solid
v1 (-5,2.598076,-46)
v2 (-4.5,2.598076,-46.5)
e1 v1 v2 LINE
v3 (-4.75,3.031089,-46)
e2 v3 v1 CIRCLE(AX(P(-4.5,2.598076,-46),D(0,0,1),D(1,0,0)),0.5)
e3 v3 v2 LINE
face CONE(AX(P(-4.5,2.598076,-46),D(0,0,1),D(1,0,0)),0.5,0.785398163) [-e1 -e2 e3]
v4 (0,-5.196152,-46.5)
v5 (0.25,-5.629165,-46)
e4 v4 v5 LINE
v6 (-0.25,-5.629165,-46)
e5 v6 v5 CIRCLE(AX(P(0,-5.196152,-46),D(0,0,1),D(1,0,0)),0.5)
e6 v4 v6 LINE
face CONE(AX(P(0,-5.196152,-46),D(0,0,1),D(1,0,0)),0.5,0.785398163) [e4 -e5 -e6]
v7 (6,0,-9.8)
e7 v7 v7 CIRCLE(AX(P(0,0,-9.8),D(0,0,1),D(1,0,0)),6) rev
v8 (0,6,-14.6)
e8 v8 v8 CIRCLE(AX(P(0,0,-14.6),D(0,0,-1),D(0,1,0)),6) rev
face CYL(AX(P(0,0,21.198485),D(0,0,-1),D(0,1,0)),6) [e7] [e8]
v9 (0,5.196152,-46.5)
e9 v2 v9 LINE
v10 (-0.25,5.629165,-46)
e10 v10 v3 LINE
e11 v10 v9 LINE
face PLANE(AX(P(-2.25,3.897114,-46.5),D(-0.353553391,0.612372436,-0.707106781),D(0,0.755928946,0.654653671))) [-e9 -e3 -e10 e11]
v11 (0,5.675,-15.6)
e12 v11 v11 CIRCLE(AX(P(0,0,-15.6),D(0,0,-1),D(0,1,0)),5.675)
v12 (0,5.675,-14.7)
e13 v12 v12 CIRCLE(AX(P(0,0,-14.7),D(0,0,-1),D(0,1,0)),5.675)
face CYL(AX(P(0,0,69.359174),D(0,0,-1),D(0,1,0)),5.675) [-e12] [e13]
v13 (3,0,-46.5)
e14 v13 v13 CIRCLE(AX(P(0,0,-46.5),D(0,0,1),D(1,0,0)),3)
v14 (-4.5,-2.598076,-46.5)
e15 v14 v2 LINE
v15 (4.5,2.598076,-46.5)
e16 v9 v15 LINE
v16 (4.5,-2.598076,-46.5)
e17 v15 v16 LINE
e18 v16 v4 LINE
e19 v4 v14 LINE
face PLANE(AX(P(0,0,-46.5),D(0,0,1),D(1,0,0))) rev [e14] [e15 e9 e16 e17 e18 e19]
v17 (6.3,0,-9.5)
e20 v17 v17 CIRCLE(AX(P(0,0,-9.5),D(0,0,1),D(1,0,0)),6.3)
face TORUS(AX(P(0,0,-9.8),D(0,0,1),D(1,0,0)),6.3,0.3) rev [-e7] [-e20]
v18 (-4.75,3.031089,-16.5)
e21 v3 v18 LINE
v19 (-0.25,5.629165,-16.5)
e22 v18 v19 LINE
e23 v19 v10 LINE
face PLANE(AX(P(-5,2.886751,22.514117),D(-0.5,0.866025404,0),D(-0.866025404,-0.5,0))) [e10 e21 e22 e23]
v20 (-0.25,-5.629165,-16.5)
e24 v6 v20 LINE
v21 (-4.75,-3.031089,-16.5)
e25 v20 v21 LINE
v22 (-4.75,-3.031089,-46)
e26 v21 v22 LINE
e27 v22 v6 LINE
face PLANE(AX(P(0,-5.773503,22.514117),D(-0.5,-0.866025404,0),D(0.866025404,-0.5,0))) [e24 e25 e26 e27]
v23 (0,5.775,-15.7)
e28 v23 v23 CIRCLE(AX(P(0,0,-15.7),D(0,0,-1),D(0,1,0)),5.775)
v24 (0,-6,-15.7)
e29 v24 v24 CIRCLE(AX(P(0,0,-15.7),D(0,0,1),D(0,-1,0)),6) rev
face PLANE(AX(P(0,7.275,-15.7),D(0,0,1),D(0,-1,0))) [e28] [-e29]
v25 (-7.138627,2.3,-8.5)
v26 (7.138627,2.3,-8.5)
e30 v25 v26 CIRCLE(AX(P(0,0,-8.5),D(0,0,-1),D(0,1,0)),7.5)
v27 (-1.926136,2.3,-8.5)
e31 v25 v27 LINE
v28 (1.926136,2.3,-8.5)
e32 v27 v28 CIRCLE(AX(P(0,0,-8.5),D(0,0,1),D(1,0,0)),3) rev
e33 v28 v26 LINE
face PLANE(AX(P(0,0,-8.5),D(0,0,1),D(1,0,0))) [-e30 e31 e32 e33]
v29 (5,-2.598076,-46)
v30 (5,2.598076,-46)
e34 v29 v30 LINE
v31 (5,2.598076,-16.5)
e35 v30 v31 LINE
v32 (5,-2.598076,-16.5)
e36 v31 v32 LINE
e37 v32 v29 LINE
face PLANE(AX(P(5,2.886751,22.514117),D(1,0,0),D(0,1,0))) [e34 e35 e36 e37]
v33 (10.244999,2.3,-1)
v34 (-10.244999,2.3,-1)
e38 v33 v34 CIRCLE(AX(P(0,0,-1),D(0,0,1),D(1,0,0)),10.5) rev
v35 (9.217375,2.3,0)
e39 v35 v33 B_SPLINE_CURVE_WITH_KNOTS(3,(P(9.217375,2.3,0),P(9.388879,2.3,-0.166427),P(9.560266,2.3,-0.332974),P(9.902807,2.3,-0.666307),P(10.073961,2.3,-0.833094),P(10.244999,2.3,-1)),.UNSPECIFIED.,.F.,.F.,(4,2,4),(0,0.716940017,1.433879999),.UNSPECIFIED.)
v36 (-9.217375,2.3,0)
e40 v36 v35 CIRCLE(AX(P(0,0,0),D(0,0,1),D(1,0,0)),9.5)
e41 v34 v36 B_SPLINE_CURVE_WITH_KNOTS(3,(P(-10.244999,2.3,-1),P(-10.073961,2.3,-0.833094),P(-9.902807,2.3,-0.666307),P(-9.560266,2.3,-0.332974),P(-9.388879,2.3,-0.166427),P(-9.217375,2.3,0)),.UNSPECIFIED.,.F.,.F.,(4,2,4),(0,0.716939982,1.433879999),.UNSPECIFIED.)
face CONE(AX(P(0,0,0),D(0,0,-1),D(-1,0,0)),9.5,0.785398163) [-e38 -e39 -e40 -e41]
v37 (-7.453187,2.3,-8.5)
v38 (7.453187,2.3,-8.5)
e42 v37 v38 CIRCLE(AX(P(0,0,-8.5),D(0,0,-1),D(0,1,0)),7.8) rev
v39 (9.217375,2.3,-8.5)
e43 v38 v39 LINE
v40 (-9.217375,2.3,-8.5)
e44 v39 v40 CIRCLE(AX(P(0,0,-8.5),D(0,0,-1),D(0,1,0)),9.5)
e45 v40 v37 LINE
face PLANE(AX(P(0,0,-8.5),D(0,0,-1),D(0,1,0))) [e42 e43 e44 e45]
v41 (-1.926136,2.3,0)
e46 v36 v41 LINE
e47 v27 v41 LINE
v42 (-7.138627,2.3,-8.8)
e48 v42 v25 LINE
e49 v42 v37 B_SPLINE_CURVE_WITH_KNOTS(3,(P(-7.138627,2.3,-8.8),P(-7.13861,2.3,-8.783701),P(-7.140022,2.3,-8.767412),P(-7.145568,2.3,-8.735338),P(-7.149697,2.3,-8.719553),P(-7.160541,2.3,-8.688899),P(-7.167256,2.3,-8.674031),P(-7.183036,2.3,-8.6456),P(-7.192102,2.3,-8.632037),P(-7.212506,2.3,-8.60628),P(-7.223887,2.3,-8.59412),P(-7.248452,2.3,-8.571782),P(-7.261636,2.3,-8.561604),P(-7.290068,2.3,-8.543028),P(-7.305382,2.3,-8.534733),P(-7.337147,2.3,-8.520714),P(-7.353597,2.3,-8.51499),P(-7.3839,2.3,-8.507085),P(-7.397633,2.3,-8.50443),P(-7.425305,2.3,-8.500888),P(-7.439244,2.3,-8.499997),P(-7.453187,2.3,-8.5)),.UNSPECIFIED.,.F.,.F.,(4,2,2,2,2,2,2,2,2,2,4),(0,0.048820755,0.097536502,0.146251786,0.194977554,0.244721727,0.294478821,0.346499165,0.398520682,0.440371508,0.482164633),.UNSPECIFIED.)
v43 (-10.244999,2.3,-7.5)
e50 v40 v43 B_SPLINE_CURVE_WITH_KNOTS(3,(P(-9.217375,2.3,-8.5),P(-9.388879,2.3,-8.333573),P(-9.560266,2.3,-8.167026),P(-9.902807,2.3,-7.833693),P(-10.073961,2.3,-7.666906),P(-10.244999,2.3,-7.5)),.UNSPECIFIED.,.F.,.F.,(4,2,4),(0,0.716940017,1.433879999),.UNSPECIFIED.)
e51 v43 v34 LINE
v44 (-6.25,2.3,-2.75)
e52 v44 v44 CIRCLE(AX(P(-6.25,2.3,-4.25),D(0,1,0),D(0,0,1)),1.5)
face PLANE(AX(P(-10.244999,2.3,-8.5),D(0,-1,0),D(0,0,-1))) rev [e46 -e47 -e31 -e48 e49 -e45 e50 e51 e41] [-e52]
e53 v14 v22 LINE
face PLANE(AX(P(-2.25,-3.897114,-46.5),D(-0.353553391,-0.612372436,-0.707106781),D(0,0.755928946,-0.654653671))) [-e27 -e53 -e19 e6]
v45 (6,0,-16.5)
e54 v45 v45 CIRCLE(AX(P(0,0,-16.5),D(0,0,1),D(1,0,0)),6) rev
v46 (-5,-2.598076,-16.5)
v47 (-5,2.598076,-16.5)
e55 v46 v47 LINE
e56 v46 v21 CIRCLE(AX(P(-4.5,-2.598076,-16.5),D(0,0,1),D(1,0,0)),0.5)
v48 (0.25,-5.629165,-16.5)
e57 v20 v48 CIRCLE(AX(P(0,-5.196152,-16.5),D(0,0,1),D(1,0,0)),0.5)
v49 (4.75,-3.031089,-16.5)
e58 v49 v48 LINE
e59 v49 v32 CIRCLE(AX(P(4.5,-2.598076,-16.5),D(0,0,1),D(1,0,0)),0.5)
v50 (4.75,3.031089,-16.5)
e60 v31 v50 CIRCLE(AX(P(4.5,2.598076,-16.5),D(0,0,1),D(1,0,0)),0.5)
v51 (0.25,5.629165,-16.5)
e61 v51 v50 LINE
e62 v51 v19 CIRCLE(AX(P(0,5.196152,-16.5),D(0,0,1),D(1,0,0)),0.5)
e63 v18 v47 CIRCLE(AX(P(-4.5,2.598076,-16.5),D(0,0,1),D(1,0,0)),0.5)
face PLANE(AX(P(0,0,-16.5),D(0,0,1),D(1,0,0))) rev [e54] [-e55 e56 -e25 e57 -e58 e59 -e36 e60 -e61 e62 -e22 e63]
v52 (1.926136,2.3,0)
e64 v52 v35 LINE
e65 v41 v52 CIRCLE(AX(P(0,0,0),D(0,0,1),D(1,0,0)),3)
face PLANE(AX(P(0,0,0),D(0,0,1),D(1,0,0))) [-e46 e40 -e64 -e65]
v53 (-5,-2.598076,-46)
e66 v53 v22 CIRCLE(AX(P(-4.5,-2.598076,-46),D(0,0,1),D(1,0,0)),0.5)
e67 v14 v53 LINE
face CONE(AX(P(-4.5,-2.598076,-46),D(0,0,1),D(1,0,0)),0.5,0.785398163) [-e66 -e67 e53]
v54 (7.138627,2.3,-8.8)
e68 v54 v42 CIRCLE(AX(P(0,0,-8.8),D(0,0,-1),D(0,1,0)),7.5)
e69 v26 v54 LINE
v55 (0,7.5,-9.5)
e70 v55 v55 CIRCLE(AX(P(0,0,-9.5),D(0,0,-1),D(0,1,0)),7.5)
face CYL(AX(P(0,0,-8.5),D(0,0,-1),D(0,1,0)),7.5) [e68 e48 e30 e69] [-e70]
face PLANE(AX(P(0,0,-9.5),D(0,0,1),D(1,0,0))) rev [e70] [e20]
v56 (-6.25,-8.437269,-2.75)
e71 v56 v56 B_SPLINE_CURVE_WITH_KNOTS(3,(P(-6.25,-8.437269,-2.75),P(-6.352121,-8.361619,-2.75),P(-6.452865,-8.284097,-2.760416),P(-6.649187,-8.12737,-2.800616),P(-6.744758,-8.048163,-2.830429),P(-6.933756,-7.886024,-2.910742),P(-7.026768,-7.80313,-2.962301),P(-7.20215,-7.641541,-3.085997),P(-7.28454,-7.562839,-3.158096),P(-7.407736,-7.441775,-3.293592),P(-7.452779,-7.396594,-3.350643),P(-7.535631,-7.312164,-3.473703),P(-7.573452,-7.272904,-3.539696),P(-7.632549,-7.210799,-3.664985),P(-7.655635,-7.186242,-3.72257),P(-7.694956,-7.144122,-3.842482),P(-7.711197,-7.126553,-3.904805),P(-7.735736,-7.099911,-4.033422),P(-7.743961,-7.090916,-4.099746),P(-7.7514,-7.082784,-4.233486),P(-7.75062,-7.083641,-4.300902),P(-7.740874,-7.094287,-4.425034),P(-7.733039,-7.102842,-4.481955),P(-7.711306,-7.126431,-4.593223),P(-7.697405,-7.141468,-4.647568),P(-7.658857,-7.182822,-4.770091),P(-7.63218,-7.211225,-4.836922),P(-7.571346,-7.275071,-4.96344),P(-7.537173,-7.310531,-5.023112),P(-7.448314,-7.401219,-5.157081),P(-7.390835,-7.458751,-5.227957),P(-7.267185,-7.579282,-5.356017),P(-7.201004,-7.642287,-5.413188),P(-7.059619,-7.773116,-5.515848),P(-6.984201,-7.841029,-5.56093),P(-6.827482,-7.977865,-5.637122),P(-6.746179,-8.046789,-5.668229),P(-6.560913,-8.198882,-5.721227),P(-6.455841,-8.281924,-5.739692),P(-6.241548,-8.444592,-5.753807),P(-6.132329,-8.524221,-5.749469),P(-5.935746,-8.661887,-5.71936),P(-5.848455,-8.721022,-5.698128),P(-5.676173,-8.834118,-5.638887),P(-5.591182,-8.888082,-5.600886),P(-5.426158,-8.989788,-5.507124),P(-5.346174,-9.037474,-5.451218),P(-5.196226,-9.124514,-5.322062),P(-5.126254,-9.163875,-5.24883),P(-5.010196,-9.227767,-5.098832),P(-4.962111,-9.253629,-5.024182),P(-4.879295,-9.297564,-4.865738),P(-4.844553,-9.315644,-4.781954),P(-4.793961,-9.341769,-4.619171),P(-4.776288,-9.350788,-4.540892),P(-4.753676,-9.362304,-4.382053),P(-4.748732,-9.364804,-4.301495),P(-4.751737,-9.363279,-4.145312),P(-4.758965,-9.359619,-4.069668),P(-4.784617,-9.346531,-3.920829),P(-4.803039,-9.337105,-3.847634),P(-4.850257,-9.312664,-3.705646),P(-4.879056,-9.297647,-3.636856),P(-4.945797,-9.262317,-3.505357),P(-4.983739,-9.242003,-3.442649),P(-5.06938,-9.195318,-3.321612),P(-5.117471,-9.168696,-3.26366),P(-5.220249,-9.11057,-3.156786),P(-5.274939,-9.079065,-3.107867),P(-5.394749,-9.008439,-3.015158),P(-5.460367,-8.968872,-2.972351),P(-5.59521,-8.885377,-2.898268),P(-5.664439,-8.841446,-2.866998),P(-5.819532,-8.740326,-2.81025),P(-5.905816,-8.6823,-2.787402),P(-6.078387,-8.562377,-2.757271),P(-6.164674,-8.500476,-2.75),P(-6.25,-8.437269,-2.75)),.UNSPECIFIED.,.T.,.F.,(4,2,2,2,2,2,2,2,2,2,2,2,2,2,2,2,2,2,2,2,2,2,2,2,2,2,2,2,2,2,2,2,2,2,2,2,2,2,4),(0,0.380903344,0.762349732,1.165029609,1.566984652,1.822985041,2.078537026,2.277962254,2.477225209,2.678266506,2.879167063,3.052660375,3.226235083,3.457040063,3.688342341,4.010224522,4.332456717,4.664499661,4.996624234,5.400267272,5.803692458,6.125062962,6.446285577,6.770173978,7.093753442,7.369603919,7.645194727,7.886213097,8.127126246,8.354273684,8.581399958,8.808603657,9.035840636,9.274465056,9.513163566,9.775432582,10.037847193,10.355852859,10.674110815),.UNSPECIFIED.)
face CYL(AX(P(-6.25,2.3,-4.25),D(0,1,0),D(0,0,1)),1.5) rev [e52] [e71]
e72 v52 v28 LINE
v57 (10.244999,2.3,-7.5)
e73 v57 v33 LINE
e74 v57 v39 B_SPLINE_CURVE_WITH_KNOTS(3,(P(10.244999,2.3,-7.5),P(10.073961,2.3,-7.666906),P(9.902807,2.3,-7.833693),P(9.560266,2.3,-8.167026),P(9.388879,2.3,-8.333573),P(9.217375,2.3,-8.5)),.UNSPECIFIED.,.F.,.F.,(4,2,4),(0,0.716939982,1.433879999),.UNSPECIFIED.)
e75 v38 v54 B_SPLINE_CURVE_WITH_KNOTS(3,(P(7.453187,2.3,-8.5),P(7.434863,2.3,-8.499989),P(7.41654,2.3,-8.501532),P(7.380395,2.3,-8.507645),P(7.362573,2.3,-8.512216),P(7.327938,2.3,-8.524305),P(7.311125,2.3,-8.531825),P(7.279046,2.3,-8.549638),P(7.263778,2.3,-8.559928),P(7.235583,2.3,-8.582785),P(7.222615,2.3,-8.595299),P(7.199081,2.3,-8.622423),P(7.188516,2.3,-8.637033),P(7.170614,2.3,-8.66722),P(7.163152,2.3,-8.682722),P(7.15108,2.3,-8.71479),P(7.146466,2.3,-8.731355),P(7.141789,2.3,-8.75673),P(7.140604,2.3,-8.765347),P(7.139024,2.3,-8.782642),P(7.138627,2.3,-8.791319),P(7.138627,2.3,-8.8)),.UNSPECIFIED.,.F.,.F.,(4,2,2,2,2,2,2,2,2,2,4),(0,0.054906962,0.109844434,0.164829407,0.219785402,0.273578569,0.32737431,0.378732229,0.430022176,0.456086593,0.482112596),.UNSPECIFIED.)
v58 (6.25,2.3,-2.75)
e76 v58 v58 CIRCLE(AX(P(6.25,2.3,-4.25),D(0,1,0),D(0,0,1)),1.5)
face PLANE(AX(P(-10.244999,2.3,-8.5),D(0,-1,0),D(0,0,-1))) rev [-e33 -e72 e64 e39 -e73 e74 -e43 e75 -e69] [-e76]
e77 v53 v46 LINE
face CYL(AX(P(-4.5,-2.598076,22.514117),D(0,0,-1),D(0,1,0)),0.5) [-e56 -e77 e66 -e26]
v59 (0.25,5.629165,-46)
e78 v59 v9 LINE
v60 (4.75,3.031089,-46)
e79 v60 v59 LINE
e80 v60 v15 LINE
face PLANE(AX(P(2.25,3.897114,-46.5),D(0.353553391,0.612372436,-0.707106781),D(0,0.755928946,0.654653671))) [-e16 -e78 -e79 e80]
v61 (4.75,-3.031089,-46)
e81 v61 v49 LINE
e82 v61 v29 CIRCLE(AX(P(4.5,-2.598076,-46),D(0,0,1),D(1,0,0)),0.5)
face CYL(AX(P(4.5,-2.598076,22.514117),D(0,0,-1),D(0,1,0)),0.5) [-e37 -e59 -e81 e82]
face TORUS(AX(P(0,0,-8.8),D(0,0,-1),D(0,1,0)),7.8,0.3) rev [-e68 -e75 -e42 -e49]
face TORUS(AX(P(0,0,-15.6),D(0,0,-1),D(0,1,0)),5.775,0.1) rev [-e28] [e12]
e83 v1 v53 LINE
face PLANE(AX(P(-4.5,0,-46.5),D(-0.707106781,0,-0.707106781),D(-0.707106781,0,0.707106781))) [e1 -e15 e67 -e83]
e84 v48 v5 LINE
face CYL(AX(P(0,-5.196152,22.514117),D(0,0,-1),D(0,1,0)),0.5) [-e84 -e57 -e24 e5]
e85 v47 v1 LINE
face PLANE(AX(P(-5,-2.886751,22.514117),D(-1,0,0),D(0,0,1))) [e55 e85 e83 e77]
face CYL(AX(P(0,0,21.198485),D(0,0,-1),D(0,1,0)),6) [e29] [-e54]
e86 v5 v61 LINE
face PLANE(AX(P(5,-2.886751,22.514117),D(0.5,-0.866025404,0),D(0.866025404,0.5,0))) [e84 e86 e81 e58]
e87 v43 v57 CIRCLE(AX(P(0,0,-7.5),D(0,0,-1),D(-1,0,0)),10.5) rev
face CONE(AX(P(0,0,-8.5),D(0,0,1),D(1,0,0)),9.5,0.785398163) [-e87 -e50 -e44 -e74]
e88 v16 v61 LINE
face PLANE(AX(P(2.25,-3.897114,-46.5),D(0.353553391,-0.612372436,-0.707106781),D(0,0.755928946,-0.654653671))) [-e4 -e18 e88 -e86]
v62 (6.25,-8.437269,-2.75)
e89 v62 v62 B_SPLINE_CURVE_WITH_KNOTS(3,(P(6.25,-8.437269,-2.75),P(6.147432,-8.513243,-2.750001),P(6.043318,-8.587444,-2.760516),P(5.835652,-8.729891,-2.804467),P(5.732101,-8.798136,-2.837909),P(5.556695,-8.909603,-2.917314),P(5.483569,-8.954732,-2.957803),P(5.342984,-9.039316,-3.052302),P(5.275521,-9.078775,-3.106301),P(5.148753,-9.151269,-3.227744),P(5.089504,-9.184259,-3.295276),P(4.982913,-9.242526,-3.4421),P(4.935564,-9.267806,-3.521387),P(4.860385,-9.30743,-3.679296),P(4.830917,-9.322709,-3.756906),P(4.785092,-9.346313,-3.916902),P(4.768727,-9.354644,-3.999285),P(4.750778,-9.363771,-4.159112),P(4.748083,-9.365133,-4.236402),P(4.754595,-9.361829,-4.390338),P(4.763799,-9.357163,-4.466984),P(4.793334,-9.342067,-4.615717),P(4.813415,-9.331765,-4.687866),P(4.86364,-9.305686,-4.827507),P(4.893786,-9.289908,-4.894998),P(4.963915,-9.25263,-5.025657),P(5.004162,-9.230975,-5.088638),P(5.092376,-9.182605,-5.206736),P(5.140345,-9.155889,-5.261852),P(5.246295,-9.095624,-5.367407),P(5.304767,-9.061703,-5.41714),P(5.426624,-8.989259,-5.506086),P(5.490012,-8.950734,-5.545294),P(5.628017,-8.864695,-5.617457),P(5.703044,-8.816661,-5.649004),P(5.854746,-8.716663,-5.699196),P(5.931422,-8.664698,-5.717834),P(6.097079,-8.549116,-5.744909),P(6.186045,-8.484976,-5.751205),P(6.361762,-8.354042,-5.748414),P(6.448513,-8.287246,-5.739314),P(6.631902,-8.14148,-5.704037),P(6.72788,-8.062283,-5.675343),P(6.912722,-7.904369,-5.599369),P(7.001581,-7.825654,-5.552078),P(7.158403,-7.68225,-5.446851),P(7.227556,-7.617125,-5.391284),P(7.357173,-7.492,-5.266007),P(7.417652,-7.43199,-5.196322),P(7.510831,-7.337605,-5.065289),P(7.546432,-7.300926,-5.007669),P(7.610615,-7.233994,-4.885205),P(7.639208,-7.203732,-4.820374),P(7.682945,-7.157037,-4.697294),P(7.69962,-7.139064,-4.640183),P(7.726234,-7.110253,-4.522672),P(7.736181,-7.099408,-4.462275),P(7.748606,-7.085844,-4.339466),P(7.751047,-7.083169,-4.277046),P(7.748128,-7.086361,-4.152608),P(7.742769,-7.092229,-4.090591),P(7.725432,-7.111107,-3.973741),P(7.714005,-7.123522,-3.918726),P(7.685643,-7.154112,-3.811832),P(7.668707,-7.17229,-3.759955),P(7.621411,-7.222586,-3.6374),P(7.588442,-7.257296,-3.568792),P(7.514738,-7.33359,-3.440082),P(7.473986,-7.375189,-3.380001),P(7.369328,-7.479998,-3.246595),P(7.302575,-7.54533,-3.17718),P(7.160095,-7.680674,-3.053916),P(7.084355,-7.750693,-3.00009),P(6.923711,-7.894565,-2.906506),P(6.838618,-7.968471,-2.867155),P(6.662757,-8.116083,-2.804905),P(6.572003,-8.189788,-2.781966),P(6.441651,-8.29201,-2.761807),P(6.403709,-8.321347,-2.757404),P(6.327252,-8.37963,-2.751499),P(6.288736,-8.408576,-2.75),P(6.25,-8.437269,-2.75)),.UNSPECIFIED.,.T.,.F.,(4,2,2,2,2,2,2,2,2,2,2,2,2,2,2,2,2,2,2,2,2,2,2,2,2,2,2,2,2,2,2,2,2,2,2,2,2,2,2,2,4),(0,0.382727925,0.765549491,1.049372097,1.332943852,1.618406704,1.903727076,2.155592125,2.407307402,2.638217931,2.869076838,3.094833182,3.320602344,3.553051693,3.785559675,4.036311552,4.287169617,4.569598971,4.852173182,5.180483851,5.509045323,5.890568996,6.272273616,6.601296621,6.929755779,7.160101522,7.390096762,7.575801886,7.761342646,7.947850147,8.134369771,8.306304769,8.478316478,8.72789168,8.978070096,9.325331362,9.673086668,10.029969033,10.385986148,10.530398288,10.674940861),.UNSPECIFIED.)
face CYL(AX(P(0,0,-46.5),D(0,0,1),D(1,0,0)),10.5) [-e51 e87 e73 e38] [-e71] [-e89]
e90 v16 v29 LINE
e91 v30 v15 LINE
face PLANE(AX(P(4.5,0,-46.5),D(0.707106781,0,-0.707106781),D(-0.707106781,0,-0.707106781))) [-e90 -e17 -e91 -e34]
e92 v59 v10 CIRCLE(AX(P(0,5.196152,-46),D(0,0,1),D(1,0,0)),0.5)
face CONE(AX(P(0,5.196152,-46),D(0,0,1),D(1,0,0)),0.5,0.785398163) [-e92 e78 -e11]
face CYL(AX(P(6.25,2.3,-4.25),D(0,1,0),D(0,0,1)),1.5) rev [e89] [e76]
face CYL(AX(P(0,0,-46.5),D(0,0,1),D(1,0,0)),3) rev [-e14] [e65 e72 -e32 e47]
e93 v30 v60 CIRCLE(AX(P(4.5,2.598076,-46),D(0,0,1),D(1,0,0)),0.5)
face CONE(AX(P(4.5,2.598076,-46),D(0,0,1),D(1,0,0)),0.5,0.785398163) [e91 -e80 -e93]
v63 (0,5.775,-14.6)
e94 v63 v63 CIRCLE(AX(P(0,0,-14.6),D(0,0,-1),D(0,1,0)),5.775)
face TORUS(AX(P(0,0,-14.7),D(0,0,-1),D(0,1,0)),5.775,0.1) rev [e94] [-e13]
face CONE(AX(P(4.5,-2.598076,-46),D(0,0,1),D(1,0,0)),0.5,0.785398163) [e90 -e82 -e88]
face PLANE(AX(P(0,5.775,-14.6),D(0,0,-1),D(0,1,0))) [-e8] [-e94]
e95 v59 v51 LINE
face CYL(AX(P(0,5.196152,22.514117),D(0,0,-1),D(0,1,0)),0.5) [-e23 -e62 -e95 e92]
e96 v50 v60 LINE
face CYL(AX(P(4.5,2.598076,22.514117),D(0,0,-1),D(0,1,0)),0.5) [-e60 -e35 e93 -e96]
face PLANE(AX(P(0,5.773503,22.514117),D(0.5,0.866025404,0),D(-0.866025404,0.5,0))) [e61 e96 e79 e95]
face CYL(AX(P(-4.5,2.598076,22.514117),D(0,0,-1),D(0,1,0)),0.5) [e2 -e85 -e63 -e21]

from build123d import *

# Parameters (mm, degrees)
SKETCH1_R             = 10.5
SKETCH1_R_2           = 3
EXTRUDE1_DEPTH        = 46.5
SKETCH1_3_R           = 3
CUT_EXTRUDE1_DEPTH    = 49.813420286
CUT_EXTRUDE4_DEPTH    = 8.5
CUT_EXTRUDE6_START    = -37
SKETCH6_R             = 10.5
SKETCH6_R_2           = 6
CUT_EXTRUDE6_DEPTH    = 37
CUT_EXTRUDE7_START    = -1
SKETCH7_R             = 10.5
SKETCH7_R_2           = 7.5
CUT_EXTRUDE7_DEPTH    = 1
M4X0_7_TAPPED_HOLE1_D = 3
SKETCH8_OUTSIDE_W     = 33.82
SKETCH8_OUTSIDE_H     = 30.82
CUT_EXTRUDE8_DEPTH    = 30
FILLET1_R             = 0.5
CHAMFER1_SIZE         = 0.5
FILLET2_R             = 0.3
CHAMFER2_SIZE         = 1


with BuildPart() as part:
    # Sketch1 → Extrude1 (new body)
    # profile 1 of 2: a face of its own
    with BuildSketch(Plane.XY):
        Circle(SKETCH1_R)
        Circle(SKETCH1_R_2, mode=Mode.SUBTRACT)
    # profile 2 of 2: a face of its own
    with BuildSketch(Plane.XY):
        Circle(SKETCH1_R_2)
    extrude(amount=-EXTRUDE1_DEPTH)

    # Sketch1<3> → Cut-Extrude1 (cut, through all)
    with BuildSketch(Plane.XY):
        Circle(SKETCH1_3_R)
    extrude(amount=-CUT_EXTRUDE1_DEPTH, mode=Mode.SUBTRACT)

    # Sketch4 → Cut-Extrude4 (cut)
    with BuildSketch(Plane.XY):
        with BuildLine():
            Line((-10.24499878, 2.3), (10.24499878, 2.3))
            ThreePointArc((10.24499878, 2.3), (0, 10.5), (-10.24499878, 2.3))
        make_face()
    extrude(amount=-CUT_EXTRUDE4_DEPTH, mode=Mode.SUBTRACT)

    # Sketch6 → Cut-Extrude6 (cut)
    with BuildSketch(Plane(origin=(0, 0, -46.5), x_dir=(1, 0, 0), z_dir=(0, 0, -1)).offset(CUT_EXTRUDE6_START)):
        Circle(SKETCH6_R)
        with Locations(Location((0, 0, 0), (0, 0, 270))):
            Circle(SKETCH6_R_2, mode=Mode.SUBTRACT)
    extrude(amount=CUT_EXTRUDE6_DEPTH, mode=Mode.SUBTRACT)

    # Sketch7 → Cut-Extrude7 (cut)
    with BuildSketch(Plane(origin=(0, 0, -9.5), x_dir=(1, 0, 0), z_dir=(0, 0, -1)).offset(CUT_EXTRUDE7_START)):
        Circle(SKETCH7_R)
        with Locations(Location((0, 0, 0), (0, 0, 270))):
            Circle(SKETCH7_R_2, mode=Mode.SUBTRACT)
    extrude(amount=CUT_EXTRUDE7_DEPTH, mode=Mode.SUBTRACT)

    # M4x0.7 Tapped Hole1 (through all)
    with Locations(Plane(origin=(6.25, 2.3, -4.25), x_dir=(0, 0, 1), z_dir=(0, 1, 0))):
        with Locations((0, 0), (0, -12.5)):
            Hole(M4X0_7_TAPPED_HOLE1_D / 2)

    # Sketch8 outside → Cut-Extrude8 (cut)
    with BuildSketch(Plane(origin=(0, 0, -46.5), x_dir=(1, 0, 0), z_dir=(0, 0, -1))):
        with Locations((0, 1.5)):
            Rectangle(SKETCH8_OUTSIDE_W, SKETCH8_OUTSIDE_H)
        Polygon((0, 5.773502692), (-5, 2.886751346), (-5, -2.886751346), (0, -5.773502692), (5, -2.886751346), (5, 2.886751346), align=None, mode=Mode.SUBTRACT)
    extrude(amount=-CUT_EXTRUDE8_DEPTH, mode=Mode.SUBTRACT)

    # Fillet1
    fillet1_edges = [part.edges().sort_by_distance(p)[0] for p in [
        (5, -2.886751346, -31.5),
        (5, 2.886751346, -31.5),
        (0, 5.773502692, -31.5),
        (-5, 2.886751346, -31.5),
        (-5, -2.886751346, -31.5),
        (0, -5.773502692, -31.5),
    ]]
    fillet(fillet1_edges, radius=FILLET1_R)

    # Chamfer1
    chamfer1_edges = [part.edges().sort_by_distance(p)[0] for p in [
        (-2.5, -4.330127019, -46.5),
        (2.5, -4.330127019, -46.5),
        (-5, 0, -46.5),
        (-2.5, 4.330127019, -46.5),
        (2.5, 4.330127019, -46.5),
        (5, 0, -46.5),
        (0, -5.696152423, -46.5),
        (4.933012702, -2.848076211, -46.5),
        (4.933012702, 2.848076211, -46.5),
        (0, 5.696152423, -46.5),
        (-4.933012702, 2.848076211, -46.5),
        (-4.933012702, -2.848076211, -46.5),
    ]]
    chamfer(chamfer1_edges, length=CHAMFER1_SIZE - 0.0001)  # a hair under: the kernel refuses the full size

    # Sketch12 → Groove for ANSI B27.7 - 3AM1-12, Basic External Retaining Ring1 (revolve, cut)
    with BuildSketch(Plane(origin=(0, 0, 19.370057685), x_dir=(0, 1, 0), z_dir=(-1, 0, 0))):
        with BuildLine():
            Line((5.775, 33.970057685), (7.275, 33.970057685))
            Line((7.275, 33.970057685), (7.275, 35.070057685))
            Line((7.275, 35.070057685), (5.775, 35.070057685))
            ThreePointArc((5.775, 35.070057685), (5.704289322, 35.040768363), (5.675, 34.970057685))
            Line((5.675, 34.970057685), (5.675, 34.070057685))
            ThreePointArc((5.675, 34.070057685), (5.704289322, 33.999347007), (5.775, 33.970057685))
        make_face()
    revolve(axis=Axis((0, 0, 69.359173663), (0, 0, -1)), mode=Mode.SUBTRACT)

    # Fillet2
    fillet2_edges = [part.edges().sort_by_distance(p)[0] for p in [
        (0, -6, -9.5),
        (0, -7.5, -8.5),
    ]]
    fillet(fillet2_edges, radius=FILLET2_R)

    # Chamfer2
    chamfer2_edges = [part.edges().sort_by_distance(p)[0] for p in [
        (0, -10.5, 0),
        (0, -10.5, -8.5),
    ]]
    chamfer(chamfer2_edges, length=CHAMFER2_SIZE)


solid = part.part
